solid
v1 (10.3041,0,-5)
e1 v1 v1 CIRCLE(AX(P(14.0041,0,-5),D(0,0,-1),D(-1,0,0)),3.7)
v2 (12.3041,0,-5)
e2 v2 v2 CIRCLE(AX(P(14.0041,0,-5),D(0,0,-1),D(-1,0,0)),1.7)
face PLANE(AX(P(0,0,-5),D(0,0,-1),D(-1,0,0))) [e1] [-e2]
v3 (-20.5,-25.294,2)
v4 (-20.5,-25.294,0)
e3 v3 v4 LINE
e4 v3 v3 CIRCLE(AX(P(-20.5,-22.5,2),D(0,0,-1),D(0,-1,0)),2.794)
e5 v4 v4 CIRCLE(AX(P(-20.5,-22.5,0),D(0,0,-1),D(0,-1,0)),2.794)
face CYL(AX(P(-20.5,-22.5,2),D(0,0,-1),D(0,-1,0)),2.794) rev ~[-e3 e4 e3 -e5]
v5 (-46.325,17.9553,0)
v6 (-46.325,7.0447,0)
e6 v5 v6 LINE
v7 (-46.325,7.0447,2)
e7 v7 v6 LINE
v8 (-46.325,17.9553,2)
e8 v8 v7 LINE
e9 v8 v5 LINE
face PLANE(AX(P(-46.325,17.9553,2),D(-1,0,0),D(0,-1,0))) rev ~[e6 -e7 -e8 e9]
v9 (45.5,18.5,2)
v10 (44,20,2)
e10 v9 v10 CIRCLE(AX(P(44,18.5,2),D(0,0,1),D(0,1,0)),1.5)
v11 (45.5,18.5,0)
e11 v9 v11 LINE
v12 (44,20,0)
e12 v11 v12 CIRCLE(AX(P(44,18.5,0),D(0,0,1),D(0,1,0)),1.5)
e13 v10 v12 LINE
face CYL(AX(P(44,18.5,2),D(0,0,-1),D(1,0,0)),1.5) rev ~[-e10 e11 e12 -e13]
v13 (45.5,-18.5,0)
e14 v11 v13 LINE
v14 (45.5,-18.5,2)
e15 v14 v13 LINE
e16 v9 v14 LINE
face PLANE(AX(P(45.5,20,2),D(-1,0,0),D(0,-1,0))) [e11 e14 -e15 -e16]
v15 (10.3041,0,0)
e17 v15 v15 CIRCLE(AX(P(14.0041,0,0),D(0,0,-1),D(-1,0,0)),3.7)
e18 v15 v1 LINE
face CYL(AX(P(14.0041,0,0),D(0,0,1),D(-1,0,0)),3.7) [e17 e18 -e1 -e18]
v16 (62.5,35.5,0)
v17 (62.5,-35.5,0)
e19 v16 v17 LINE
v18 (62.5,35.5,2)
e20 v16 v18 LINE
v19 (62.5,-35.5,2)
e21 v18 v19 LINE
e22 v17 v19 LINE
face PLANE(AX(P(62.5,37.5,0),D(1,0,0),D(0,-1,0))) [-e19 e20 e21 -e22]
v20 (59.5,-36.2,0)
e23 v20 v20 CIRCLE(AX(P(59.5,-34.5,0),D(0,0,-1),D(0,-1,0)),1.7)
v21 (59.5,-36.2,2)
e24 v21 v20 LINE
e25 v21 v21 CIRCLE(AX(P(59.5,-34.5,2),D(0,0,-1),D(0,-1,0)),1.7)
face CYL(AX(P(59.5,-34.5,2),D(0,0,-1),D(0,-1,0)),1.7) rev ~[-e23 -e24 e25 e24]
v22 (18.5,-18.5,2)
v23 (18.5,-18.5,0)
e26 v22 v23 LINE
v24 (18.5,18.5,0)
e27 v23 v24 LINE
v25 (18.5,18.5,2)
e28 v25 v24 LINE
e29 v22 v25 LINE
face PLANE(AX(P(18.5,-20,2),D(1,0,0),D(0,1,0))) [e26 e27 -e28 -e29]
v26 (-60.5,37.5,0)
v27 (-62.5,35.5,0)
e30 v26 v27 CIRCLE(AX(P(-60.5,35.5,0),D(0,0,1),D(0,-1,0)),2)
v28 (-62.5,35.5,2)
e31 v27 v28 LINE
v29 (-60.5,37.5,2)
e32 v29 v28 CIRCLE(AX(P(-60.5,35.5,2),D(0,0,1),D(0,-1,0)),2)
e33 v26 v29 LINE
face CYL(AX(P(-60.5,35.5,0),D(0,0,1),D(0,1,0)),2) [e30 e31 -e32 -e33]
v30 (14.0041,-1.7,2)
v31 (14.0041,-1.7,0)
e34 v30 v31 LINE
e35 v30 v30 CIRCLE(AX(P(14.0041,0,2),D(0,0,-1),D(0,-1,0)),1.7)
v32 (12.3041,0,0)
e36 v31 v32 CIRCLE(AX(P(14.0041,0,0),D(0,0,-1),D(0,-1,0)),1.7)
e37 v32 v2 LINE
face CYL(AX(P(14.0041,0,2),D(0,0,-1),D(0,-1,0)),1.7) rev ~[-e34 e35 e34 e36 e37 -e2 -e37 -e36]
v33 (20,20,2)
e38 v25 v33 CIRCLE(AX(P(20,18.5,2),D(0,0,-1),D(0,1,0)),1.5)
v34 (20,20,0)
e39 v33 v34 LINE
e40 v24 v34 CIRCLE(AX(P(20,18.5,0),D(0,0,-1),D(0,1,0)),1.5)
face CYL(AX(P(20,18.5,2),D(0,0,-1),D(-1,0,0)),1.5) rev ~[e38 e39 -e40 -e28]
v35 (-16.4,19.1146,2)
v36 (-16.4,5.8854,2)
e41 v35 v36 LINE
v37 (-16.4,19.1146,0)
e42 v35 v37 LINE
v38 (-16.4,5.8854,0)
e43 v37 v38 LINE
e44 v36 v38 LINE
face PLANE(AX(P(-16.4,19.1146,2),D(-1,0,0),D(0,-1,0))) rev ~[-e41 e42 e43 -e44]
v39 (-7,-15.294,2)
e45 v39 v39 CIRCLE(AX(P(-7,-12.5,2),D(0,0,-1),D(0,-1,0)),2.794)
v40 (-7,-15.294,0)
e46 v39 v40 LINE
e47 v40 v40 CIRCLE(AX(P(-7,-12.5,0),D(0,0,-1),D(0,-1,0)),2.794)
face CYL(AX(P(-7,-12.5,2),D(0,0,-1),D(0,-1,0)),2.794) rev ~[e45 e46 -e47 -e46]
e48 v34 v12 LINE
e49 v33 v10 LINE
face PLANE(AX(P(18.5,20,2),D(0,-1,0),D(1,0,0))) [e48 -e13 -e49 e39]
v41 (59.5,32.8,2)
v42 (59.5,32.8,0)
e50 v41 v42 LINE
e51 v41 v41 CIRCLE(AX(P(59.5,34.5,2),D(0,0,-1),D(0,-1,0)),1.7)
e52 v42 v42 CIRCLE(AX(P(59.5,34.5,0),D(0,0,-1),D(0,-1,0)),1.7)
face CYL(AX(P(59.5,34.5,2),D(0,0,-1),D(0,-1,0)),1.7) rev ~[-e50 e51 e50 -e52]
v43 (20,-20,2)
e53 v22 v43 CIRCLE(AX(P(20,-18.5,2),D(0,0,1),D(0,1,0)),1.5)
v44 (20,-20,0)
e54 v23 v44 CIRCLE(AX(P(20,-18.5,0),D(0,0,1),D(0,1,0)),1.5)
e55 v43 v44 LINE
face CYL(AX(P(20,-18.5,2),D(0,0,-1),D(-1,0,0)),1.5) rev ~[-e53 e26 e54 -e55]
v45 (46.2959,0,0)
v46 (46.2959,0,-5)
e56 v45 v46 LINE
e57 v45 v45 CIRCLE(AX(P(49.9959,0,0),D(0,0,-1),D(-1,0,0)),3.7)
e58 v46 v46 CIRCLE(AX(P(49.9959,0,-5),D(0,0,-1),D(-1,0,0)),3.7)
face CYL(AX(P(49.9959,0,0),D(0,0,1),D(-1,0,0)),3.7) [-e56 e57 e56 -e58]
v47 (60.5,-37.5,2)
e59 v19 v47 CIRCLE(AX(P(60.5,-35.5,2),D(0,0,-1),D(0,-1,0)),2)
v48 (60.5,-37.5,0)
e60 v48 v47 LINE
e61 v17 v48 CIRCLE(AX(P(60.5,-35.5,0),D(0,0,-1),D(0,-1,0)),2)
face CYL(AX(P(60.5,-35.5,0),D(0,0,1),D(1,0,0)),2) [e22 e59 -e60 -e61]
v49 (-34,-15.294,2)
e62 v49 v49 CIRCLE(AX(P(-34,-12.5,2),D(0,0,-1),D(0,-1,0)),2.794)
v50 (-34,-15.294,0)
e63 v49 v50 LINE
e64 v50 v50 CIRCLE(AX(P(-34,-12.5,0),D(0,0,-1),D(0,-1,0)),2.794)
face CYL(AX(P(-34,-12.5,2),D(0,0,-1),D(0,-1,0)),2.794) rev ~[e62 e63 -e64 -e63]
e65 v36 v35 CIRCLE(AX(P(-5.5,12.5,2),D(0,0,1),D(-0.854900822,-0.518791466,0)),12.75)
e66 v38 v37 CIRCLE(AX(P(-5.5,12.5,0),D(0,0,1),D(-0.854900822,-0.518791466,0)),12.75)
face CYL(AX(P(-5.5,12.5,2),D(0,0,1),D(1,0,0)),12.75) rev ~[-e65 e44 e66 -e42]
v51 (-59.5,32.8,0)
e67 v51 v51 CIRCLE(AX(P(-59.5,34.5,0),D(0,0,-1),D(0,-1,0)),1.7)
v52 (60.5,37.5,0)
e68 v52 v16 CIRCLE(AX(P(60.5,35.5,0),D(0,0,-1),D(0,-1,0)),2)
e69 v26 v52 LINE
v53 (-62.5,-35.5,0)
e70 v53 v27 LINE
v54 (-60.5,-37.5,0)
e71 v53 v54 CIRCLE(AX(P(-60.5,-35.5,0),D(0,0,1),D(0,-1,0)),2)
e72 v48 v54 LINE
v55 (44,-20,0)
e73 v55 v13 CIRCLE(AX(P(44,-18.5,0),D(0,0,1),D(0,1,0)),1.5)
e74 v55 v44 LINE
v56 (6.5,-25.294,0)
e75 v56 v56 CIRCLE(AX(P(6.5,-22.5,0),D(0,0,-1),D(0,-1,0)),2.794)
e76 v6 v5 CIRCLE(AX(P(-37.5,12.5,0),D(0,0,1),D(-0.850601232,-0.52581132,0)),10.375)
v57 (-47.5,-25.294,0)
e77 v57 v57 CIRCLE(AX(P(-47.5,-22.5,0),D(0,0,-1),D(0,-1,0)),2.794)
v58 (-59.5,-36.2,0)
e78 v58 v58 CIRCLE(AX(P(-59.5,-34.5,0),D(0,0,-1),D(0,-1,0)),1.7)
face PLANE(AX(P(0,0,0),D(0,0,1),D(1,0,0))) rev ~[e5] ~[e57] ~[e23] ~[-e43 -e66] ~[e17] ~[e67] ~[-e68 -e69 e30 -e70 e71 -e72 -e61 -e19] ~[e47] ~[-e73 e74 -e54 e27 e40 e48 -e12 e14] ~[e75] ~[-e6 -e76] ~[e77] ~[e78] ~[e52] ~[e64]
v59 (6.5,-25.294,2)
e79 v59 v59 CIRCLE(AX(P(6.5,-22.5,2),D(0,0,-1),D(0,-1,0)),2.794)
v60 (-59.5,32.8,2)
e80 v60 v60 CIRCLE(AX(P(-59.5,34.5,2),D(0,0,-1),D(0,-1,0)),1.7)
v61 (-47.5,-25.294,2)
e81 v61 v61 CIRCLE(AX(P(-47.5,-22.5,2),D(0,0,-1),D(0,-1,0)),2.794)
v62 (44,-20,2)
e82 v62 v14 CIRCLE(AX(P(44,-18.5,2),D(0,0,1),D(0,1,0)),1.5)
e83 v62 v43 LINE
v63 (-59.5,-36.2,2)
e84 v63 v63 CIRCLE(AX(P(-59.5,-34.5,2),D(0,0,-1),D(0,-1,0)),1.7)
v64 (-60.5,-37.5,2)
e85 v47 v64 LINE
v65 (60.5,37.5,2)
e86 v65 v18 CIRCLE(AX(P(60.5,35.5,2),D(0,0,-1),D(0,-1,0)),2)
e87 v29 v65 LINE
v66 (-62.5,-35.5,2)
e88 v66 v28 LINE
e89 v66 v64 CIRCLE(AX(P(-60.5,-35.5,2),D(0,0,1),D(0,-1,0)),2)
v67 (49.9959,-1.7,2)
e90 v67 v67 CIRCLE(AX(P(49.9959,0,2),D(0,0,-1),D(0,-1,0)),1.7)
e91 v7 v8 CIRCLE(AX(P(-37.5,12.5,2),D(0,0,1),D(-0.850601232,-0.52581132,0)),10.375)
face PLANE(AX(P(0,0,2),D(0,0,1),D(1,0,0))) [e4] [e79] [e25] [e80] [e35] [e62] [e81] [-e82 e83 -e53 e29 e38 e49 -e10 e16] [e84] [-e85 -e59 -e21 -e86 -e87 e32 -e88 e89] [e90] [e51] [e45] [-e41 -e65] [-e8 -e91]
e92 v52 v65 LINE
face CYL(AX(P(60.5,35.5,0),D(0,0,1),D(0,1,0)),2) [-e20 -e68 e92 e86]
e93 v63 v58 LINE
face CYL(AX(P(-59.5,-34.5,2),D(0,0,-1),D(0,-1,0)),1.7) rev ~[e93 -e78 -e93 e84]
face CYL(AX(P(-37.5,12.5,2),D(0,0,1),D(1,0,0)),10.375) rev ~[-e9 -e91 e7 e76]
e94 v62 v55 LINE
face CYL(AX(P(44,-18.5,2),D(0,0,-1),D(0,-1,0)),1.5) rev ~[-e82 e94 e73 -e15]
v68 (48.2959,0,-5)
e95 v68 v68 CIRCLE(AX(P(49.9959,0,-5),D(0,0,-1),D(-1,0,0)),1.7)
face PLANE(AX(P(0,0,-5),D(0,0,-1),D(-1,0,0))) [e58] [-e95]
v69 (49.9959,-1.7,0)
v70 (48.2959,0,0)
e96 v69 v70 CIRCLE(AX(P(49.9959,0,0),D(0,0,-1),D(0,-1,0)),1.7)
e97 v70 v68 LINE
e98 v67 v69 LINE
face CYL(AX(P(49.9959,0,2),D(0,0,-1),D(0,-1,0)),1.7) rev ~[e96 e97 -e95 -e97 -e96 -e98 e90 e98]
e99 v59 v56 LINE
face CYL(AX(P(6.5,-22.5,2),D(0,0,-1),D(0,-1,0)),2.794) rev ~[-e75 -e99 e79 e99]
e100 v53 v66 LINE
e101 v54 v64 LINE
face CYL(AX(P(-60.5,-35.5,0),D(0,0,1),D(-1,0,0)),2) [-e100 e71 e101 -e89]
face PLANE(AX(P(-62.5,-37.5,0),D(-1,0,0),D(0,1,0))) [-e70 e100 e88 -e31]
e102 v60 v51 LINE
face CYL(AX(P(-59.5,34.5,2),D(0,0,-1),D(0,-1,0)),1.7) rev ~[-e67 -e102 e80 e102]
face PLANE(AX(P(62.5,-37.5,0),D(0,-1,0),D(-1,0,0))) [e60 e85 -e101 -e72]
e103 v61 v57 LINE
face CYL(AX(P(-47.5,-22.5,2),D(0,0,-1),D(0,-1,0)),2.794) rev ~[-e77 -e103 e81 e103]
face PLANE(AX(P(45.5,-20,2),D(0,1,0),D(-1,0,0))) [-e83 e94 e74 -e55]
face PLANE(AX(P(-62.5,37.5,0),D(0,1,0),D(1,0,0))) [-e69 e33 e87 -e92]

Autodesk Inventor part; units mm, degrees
ref_plane "YZ Plane" through (0, 0, 0) normal (1, 0, 0) x (0, 1, 0)
ref_plane "XZ Plane" through (0, 0, 0) normal (0, 1, 0) x (-1, 0, 0)
ref_plane "XY Plane" through (0, 0, 0) normal (0, 0, 1) x (1, 0, 0)
sketch "Sketch1" plane through (0, 0, 0) normal (0, 0, 1) x (1, 0, 0)
  line L0 (-62.5, 37.5) -> (62.5, 37.5)
  line L1 (62.5, 37.5) -> (62.5, -37.5)
  line L2 (62.5, -37.5) -> (-62.5, -37.5)
  line L3 (-62.5, -37.5) -> (-62.5, 37.5)
  point P0 (0, 0)
  point P1 (-62.5, 0)
  point P2 (0, 37.5)
  dimension "d0" = 125
  dimension "d1" = 75
extrude "Extrusion1" add sketch "Sketch1" along normal blind 2
sketch "Sketch2" plane through (0, 0, 2) normal (0, 0, 1) x (1, 0, 0)
  line L0 (-62.5, -37.5) -> (62.5, -37.5) projected
  line L1 (62.5, -37.5) -> (62.5, 37.5) projected
  line L2 (62.5, 37.5) -> (-62.5, 37.5) projected
  line L3 (-62.5, 37.5) -> (-62.5, -37.5) projected
  line L4 (-59.5, 34.5) -> (59.5, 34.5)
  line L5 (59.5, 34.5) -> (59.5, -34.5)
  line L6 (59.5, -34.5) -> (-59.5, -34.5)
  line L7 (-59.5, -34.5) -> (-59.5, 34.5)
  point P0 (0, 0)
  dimension "d4" = 3
hole "Hole1" at (-59.5, 34.5, 2) at (59.5, 34.5, 2) at (-59.5, -34.5, 2) at (59.5, -34.5, 2) direction (0, 0, -1) diameter 3.4 end through all clearance for "Oval Head Machine Screw" size "M3" standard "Ansi Metric M Profile"
fillet "Fillet1" radius 2 4 edges at (-62.5, 37.5, 1) (-62.5, -37.5, 1) (62.5, -37.5, 1) (62.5, 37.5, 1)
sketch "Sketch3" plane through (0, 0, 2) normal (0, 0, 1) x (1, 0, 0)
  line L0 (18.5, 20) -> (45.5, 20)
  line L1 (45.5, 20) -> (45.5, -20)
  line L2 (45.5, -20) -> (18.5, -20)
  line L3 (18.5, -20) -> (18.5, 20)
  line L4 (62.5, -35.5) -> (62.5, 35.5) projected
  point P0 (0, 0)
  point P1 (18.5, 0)
  dimension "d13" = 27
  dimension "d14" = 40
  dimension "d16" = 17
extrude "Extrusion2" cut sketch "Sketch3" against normal through all
fillet "Fillet2" radius 1.5 4 edges at (18.5, -20, 1) (18.5, 20, 1) (45.5, 20, 1) (45.5, -20, 1)
sketch "Sketch4" plane through (0, 0, 2) normal (0, 0, 1) x (1, 0, 0)
  line L0 (44, 20) -> (20, 20) projected
  line L1 (44, -20) -> (20, -20) projected
  line L2 (18.5, -18.5) -> (18.5, 18.5) projected
  line L3 (20, 20) -> (44, 20) projected
  line L4 (45.5, 18.5) -> (45.5, -18.5) projected
  line L5 (14.0041, -17.1435) -> (14.0041, 17.1435)
  line L6 (49.9959, 17.1435) -> (49.9959, -17.1435)
  line L7 (32, 20) -> (32, -20)
  point P0 (0, 0)
  point P1 (14.0041, 0)
  point P2 (49.9959, 0)
  dimension "d21" = 35.9918
hole "Hole2" at (14.0041, 0, 2) at (49.9959, 0, 2) direction (0, 0, -1) diameter 3.4 depth 6 tip angle 118 clearance for "Oval Head Machine Screw" size "M3" standard "Ansi Metric M Profile"
sketch "Sketch5" plane through (0, 0, 2) normal (0, 0, 1) x (1, 0, 0)
  circle A0 centre (-37.5, 12.5) radius 10.375
  line L0 (-46.325, 17.9553) -> (-46.325, 7.0447)
  line L1 (-62.5, 35.5) -> (-62.5, -35.5) projected
  line L2 (60.5, 37.5) -> (-60.5, 37.5) projected
  point P0 (0, 0)
  dimension "d29" = 20.75
  dimension "d30" = 8.825
  dimension "d31" = 25
  dimension "d32" = 25
extrude "Extrusion3" cut sketch "Sketch5" against normal blind 10 contours A0 L0 picked at (-32.9905, 14.9651)
sketch "Sketch6" plane through (0, 0, 2) normal (0, 0, 1) x (1, 0, 0)
  circle A0 centre (-5.5, 12.5) radius 12.75
  line L0 (-16.4, 19.1146) -> (-16.4, 5.8854)
  arc A1 (-46.325, 7.0447) -> (-46.325, 17.9553) centre (-37.5, 12.5) ccw projected
  point P0 (0, 0)
  dimension "d35" = 25.5
  dimension "d36" = 10.9
  dimension "d37" = 32
extrude "Extrusion4" cut sketch "Sketch6" against normal blind 10 contours A0 L0 picked at (-6.5005, 11.8775)
sketch "Sketch7" plane through (0, 0, 2) normal (0, 0, 1) x (1, 0, 0)
  line L0 (-47.5, -22.5) -> (6.5, -22.5)
  line L1 (-62.5, 35.5) -> (-62.5, -35.5) projected
  line L2 (-60.5, -37.5) -> (60.5, -37.5) projected
  line L3 (-34, -12.5) -> (-7, -12.5)
  point P0 (0, 0)
  point P1 (-20.5, -22.5)
  point P2 (-20.5, -12.5)
  dimension "d40" = 54
  dimension "d43" = 15
  dimension "d56" = 15
  dimension "d57" = 10
  dimension "d58" = 27
hole "Hole3" at (-47.5, -22.5, 2) at (6.5, -22.5, 2) at (-20.5, -22.5, 2) at (-34, -12.5, 2) at (-7, -12.5, 2) direction (0, 0, -1) diameter 5.588 end through all thread size "1/4-36 UNS" class "2B" standard "ANSI Unified Screw Threads"
sketch "Sketch8" plane through (0, 0, 0) normal (0, 0, -1) x (-1, 0, 0)
  circle A0 centre (-49.9959, 0) radius 1.7 projected
  circle A1 centre (-14.0041, 0) radius 1.7 projected
  circle A2 centre (-49.9959, 0) radius 3.7
  circle A3 centre (-14.0041, 0) radius 3.7
  point P0 (0, 0)
  dimension "d52" = 2
  dimension "d53" = 2
extrude "Extrusion5" add sketch "Sketch8" along normal blind 5
properties part number "LI0011-IO SHIELD"
